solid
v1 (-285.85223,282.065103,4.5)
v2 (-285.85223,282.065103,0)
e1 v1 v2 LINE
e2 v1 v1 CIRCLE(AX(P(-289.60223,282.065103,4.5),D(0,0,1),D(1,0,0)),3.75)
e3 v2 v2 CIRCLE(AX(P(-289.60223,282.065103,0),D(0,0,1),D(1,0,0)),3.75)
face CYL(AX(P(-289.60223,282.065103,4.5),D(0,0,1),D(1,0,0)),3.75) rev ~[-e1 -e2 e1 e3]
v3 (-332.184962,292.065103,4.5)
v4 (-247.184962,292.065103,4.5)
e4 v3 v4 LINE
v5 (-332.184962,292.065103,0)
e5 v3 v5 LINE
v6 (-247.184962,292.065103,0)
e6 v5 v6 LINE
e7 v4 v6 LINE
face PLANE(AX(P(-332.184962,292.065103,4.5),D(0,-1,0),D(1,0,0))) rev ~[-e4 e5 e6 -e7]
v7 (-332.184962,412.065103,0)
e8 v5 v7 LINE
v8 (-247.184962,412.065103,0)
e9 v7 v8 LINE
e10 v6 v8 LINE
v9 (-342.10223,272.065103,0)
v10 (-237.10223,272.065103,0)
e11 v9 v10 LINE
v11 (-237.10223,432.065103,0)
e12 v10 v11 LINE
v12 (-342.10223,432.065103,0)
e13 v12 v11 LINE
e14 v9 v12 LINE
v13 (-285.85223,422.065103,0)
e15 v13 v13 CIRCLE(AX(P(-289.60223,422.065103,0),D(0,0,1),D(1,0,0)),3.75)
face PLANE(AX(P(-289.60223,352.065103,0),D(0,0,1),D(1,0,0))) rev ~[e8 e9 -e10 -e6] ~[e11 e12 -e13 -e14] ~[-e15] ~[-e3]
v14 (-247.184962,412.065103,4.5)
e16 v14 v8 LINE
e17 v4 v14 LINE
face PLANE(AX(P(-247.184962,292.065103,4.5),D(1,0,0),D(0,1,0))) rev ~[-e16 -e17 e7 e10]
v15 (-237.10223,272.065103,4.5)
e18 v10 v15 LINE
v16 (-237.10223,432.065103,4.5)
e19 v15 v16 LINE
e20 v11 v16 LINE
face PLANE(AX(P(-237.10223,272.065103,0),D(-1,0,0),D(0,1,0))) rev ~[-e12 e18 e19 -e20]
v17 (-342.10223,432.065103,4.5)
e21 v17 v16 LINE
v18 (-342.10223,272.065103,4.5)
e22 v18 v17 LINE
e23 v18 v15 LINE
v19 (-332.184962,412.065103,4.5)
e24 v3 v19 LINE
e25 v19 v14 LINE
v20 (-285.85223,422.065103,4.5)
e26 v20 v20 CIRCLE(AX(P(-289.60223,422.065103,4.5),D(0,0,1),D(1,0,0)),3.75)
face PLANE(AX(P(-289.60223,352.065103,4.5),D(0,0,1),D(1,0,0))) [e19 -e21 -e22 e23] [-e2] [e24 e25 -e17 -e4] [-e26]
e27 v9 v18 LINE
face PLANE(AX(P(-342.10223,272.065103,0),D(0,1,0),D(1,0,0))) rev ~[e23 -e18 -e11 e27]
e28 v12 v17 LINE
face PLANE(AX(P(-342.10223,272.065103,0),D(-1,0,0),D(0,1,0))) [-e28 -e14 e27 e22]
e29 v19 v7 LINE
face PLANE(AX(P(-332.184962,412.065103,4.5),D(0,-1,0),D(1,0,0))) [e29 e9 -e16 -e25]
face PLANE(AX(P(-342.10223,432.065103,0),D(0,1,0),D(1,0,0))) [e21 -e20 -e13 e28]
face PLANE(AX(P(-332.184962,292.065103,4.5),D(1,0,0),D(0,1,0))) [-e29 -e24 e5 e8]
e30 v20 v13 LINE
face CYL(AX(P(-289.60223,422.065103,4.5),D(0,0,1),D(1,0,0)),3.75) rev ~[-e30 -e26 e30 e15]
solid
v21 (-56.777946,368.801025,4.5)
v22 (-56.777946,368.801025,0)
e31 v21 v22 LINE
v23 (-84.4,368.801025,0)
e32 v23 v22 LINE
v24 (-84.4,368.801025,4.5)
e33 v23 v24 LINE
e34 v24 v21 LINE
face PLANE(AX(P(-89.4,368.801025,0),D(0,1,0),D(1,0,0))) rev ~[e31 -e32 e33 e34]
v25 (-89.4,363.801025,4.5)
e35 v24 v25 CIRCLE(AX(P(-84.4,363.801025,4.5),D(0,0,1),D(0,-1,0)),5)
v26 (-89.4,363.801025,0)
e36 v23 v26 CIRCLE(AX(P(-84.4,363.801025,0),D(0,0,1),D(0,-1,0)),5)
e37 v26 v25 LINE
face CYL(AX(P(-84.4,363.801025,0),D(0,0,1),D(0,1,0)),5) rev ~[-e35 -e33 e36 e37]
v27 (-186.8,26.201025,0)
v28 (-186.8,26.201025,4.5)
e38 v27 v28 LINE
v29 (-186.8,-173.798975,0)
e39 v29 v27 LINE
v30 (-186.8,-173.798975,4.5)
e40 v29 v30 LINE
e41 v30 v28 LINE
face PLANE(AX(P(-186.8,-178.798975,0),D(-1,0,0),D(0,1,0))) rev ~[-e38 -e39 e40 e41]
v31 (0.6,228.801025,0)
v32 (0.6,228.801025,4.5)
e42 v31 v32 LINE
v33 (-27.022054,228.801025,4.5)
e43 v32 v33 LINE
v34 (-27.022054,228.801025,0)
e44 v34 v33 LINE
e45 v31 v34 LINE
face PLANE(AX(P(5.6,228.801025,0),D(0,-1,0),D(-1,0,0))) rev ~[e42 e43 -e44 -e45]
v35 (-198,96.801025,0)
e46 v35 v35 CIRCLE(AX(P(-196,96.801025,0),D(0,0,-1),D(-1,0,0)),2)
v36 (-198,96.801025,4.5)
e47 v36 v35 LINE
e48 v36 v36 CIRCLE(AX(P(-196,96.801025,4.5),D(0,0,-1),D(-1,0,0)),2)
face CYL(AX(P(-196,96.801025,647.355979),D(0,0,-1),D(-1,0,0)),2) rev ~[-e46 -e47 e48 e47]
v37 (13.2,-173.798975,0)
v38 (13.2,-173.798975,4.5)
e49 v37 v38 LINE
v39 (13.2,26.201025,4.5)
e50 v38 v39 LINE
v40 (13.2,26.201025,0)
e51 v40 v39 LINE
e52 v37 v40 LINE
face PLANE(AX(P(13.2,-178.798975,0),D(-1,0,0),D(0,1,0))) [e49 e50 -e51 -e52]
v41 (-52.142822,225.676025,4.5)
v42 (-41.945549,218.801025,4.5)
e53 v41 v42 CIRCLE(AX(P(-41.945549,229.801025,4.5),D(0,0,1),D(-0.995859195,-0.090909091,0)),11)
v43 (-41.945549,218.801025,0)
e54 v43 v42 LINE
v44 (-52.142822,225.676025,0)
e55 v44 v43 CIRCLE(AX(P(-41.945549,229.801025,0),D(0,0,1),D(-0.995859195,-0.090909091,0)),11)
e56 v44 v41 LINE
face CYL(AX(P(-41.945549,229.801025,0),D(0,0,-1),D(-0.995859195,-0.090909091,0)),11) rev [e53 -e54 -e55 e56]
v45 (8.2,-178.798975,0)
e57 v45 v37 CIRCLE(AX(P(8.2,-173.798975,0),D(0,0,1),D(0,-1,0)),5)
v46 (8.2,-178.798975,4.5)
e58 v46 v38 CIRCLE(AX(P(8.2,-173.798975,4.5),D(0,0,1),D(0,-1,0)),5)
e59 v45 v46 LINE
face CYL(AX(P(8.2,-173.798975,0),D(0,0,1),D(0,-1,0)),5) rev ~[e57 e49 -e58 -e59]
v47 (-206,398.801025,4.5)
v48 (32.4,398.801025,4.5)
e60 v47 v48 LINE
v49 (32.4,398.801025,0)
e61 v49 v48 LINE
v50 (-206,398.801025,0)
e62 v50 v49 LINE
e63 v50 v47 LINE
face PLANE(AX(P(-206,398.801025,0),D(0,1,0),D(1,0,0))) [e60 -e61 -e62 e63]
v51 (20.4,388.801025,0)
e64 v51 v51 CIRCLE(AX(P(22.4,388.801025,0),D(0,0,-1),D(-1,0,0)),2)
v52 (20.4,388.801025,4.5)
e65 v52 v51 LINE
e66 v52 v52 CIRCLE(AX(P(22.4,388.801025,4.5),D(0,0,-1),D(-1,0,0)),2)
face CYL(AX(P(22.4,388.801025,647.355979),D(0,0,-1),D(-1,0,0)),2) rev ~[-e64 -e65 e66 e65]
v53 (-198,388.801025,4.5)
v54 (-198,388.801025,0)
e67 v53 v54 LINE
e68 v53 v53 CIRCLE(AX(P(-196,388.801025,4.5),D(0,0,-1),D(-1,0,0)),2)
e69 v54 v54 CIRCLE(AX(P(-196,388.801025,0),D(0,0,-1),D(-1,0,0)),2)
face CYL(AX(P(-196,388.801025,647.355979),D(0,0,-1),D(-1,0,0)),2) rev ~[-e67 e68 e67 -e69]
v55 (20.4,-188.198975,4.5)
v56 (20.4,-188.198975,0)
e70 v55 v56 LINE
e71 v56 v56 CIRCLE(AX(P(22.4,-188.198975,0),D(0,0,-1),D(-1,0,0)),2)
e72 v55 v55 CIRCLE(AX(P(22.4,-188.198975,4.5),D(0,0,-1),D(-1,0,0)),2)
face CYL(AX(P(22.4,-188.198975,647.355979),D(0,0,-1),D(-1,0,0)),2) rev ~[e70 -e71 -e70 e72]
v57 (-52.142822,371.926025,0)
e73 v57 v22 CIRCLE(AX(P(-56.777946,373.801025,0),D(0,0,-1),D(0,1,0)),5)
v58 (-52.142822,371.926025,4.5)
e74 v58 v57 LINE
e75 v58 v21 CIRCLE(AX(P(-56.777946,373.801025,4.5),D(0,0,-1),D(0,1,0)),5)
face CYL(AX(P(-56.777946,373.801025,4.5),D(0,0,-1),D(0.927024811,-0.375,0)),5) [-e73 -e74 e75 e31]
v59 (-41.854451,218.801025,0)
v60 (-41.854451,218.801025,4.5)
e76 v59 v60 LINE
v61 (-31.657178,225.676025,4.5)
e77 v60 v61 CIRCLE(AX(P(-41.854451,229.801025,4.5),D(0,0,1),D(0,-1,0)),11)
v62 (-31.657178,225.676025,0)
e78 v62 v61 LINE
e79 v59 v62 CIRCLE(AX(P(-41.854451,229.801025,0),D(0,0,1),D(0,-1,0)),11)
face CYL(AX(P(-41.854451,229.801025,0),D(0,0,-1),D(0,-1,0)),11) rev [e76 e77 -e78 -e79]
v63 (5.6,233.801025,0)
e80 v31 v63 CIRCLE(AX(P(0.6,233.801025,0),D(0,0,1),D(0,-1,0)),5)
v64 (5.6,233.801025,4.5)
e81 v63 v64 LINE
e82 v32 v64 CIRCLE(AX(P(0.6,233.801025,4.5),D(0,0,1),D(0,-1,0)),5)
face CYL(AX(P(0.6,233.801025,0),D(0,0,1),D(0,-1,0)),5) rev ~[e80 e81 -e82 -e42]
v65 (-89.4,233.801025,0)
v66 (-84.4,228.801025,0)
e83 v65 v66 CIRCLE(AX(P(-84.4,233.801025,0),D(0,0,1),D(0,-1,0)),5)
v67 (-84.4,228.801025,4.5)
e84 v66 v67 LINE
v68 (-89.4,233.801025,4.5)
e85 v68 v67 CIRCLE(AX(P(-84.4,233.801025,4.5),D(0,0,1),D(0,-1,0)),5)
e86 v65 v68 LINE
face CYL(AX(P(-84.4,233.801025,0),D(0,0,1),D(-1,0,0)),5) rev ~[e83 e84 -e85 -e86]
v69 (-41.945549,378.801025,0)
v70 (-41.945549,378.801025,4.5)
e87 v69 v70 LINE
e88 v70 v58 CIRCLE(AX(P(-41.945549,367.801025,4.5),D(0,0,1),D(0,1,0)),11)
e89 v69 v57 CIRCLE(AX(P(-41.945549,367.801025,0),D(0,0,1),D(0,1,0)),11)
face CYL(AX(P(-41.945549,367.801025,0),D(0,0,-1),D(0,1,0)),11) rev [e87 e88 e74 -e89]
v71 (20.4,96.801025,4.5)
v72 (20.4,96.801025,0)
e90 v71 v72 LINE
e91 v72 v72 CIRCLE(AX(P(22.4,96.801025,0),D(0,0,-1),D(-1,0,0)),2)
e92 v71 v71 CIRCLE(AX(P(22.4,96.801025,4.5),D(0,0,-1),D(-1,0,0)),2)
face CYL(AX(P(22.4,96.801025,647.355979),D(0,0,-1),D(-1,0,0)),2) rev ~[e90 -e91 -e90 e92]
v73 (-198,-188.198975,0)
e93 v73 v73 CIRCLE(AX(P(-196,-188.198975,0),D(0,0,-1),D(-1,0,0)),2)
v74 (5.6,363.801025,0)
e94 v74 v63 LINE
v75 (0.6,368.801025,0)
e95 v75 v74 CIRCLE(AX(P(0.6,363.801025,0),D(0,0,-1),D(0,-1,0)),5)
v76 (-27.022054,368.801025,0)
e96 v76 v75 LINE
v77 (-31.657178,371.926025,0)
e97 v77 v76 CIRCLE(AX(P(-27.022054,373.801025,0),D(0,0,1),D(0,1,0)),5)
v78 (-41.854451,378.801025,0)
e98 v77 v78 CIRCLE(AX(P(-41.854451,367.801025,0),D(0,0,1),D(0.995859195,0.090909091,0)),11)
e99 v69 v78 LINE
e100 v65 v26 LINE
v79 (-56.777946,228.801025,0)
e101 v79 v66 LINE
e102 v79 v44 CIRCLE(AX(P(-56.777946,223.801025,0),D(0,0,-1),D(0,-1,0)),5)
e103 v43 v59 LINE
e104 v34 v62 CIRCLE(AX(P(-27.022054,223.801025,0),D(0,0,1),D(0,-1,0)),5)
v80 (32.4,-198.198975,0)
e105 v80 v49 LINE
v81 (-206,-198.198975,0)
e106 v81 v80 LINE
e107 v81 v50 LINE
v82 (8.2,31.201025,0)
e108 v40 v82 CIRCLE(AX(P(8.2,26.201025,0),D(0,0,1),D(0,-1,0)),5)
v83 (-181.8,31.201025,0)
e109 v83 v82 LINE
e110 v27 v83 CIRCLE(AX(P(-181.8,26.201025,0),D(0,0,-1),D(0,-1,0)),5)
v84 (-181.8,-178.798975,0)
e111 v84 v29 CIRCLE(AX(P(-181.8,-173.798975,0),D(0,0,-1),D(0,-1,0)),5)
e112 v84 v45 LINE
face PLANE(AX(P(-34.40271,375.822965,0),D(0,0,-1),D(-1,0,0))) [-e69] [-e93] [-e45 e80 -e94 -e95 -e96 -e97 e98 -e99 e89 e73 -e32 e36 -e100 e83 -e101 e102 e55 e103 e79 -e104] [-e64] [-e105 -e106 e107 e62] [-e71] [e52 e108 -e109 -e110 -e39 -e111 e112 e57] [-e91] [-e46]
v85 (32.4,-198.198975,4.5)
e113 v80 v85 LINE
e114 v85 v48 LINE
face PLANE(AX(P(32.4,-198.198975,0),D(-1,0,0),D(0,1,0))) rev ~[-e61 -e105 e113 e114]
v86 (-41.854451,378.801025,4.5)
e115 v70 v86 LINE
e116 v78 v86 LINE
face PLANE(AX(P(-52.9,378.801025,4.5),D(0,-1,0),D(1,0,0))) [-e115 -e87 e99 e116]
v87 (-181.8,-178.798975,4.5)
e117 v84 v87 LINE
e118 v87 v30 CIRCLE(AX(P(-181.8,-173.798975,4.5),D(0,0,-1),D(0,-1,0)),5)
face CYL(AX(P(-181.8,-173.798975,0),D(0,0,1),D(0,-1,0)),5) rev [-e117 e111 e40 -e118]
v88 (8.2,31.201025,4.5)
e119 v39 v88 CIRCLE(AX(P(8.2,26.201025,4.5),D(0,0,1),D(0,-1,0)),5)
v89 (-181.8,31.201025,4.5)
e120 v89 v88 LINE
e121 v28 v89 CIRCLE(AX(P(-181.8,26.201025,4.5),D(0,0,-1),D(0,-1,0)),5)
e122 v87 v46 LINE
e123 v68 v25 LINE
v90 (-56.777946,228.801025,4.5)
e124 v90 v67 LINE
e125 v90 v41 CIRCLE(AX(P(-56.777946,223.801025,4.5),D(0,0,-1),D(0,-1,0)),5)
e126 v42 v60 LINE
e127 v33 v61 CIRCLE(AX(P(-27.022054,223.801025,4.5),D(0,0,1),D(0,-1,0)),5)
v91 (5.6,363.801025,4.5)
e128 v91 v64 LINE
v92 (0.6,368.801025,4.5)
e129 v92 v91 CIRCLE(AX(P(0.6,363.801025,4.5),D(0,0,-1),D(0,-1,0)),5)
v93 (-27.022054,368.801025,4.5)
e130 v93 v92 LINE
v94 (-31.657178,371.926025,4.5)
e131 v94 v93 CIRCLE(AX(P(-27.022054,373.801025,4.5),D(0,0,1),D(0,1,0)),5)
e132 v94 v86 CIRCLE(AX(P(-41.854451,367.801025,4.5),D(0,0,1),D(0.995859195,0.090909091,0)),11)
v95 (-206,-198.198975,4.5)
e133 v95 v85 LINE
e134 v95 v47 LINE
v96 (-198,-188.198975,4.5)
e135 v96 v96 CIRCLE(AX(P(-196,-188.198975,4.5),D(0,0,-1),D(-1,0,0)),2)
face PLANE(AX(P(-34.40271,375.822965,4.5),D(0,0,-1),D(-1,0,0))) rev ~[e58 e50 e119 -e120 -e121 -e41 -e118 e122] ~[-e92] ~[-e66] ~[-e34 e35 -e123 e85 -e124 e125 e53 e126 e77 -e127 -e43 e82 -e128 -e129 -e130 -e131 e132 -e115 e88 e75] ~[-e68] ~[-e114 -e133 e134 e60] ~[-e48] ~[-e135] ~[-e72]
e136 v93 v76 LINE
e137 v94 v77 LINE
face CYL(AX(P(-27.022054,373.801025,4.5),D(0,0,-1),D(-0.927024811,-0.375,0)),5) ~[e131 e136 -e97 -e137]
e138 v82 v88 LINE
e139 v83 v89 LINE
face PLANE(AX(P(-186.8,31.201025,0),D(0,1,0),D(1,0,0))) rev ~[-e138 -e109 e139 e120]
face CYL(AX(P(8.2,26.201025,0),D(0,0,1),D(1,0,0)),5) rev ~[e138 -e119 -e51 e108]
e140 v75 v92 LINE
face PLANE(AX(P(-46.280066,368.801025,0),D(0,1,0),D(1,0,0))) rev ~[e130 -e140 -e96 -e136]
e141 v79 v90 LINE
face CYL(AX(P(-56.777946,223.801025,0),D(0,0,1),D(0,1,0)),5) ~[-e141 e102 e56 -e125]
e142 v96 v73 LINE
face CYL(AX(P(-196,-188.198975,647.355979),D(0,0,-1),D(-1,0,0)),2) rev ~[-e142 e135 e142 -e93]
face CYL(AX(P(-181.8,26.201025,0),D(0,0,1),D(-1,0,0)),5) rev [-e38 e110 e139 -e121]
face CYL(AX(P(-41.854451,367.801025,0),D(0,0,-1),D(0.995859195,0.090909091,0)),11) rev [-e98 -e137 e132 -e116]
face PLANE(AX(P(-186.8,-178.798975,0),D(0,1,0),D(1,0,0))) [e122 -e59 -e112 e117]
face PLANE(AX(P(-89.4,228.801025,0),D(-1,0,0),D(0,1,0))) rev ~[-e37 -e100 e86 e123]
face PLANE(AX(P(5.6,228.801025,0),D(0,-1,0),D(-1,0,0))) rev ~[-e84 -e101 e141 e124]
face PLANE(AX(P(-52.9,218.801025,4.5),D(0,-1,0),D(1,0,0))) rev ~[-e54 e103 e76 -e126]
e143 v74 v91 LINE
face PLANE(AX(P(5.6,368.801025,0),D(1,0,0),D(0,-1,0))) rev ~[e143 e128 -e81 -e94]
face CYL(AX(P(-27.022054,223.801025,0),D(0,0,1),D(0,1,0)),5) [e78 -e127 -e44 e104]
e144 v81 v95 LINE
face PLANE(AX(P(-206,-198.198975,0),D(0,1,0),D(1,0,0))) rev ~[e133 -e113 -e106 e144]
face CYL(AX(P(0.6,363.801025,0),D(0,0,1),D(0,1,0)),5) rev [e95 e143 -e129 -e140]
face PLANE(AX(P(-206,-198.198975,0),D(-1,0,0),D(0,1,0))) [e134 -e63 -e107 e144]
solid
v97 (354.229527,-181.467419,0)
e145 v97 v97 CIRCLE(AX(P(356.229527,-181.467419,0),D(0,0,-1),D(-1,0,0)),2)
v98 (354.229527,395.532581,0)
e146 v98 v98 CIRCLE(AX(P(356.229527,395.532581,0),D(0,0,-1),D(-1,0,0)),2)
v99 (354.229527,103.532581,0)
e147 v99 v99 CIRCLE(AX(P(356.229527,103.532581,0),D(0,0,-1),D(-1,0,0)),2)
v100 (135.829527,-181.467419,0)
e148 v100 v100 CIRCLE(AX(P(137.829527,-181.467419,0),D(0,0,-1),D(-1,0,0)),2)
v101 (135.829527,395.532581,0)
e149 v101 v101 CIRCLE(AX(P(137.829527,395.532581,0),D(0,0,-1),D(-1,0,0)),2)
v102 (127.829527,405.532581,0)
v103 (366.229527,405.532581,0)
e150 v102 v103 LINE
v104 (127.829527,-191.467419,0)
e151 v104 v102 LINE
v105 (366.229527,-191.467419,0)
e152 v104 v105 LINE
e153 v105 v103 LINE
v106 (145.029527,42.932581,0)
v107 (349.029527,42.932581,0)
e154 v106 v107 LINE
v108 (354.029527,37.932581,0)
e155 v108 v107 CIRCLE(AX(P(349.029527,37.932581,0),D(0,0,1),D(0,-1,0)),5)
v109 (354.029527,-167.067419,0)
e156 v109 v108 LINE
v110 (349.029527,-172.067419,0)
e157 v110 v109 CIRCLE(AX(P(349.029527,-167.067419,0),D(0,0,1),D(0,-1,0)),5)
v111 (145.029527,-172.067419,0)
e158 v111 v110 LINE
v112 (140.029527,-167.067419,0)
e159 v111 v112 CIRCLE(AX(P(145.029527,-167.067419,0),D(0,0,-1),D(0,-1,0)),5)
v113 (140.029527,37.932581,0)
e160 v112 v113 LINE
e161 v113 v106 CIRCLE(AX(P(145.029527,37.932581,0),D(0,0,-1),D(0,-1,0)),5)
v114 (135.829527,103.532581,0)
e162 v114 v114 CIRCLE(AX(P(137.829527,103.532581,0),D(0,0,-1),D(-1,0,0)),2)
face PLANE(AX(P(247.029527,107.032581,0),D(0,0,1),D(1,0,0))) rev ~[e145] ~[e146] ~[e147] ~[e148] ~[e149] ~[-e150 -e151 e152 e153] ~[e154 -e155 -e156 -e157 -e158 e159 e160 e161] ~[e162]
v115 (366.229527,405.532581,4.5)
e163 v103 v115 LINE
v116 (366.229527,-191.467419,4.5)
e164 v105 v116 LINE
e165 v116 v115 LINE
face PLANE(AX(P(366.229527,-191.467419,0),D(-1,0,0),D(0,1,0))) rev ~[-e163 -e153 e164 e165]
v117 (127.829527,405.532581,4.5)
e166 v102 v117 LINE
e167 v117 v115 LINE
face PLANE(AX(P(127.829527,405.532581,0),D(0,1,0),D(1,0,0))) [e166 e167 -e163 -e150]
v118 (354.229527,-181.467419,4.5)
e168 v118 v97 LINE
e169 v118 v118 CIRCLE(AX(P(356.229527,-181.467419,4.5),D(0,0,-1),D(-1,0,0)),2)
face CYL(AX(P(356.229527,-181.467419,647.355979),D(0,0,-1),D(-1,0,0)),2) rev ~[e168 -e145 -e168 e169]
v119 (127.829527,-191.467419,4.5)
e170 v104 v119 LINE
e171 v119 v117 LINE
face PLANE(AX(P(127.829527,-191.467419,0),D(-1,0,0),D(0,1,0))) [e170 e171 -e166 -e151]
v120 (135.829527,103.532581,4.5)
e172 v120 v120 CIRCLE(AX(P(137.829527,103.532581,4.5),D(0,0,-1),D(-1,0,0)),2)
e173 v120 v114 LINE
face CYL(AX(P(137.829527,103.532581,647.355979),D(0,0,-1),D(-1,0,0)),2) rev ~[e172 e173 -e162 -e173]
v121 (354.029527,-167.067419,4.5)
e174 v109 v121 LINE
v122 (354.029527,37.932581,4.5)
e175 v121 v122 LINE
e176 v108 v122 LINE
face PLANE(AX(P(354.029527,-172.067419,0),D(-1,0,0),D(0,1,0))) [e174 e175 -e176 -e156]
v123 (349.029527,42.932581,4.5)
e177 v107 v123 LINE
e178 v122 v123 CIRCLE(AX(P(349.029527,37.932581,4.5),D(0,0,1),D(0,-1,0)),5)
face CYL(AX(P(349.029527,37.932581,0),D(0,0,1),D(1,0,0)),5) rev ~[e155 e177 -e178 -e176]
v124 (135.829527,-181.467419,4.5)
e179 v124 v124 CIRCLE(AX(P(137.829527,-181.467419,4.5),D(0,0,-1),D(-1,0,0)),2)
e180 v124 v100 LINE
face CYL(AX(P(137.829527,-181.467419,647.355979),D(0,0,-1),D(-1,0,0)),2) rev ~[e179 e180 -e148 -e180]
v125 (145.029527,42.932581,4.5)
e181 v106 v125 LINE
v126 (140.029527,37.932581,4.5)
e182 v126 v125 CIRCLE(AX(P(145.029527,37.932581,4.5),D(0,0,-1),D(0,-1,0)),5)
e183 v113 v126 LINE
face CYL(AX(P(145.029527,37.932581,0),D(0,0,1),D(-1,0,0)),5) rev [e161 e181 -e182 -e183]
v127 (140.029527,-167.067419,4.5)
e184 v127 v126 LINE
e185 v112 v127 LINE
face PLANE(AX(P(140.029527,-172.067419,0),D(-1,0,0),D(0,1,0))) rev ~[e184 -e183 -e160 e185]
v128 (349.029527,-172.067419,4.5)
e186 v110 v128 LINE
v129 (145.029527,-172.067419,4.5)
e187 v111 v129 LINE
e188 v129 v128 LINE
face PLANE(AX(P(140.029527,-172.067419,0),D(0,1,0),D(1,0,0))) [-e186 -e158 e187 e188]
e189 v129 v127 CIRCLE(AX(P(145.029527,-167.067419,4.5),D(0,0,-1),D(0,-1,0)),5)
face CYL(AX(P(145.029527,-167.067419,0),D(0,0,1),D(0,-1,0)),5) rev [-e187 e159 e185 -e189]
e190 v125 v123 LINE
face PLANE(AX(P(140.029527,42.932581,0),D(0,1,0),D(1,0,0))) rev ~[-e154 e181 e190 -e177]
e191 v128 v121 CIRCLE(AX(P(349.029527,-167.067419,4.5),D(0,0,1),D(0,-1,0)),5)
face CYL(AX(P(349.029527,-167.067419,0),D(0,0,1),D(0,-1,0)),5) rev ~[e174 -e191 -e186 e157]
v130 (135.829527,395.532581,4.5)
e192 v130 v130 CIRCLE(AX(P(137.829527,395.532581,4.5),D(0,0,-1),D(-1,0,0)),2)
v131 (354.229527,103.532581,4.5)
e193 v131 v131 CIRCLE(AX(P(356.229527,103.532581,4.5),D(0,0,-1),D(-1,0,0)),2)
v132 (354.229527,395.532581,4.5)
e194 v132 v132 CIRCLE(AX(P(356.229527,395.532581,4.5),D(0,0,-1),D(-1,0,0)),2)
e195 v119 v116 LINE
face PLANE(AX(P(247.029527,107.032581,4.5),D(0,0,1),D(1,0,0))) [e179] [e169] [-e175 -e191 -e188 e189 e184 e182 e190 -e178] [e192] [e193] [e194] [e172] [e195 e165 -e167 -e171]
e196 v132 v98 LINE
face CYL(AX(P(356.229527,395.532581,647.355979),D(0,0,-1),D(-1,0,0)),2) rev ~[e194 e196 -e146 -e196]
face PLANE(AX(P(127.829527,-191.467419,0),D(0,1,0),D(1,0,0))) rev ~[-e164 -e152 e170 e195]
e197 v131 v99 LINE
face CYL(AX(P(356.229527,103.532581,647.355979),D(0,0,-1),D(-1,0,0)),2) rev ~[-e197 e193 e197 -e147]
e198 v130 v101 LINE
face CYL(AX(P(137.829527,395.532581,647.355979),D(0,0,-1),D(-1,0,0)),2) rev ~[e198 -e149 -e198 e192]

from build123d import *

# Parameters (mm, degrees)
F0_W         = 238.4
F0_H         = 597
F0_W_2       = 200
F0_H_2       = 210
F1_DEPTH     = 4.5
F3_D         = 4
F4_W         = 238.4
F4_H         = 597
F4_W_2       = 214
F4_H_2       = 215
F5_DEPTH     = 4.5
F7_D         = 4
F8_R         = 5
F9_R         = 5
F10_R        = 5
F11_W        = 105
F11_H        = 160
F12_DEPTH    = 4.5
F13_W        = 85
F13_H        = 120
F13_R        = 3.75
F14_DEPTH    = 25
F15_W        = 22
F15_H        = 160
F16_DEPTH    = 25
F17_T1_DEPTH = 4.5
F18_R        = 5


# Not quite as in the source:
# - a fillet or chamfer that OpenCascade refuses, or shapes differently, is made with other operations: its cross-section is extruded or revolved along the edge and cut away or added


with BuildPart() as f1:
    # F0 (on Top) → F1 (new body)
    with BuildSketch(Plane.XY):
        with Locations((-86.8, 100.3010249138)):
            Rectangle(F0_W, F0_H)
        with Locations((-86.8, -73.7989750862)):
            Rectangle(F0_W_2, F0_H_2, mode=Mode.SUBTRACT)
        with BuildLine():
            ThreePointArc((-52.6800657034, 368.8010249138), (-49.4800657034, 372.0010249138), (-46.2800657034, 368.8010249138))
            Line((-46.2800657034, 368.8010249138), (5.6, 368.8010249138))
            Line((5.6, 368.8010249138), (5.6, 228.8010249138))
            Line((5.6, 228.8010249138), (-89.4, 228.8010249138))
            Line((-89.4, 228.8010249138), (-89.4, 368.8010249138))
            Line((-89.4, 368.8010249138), (-52.6800657034, 368.8010249138))
        make_face(mode=Mode.SUBTRACT)
    extrude(amount=F1_DEPTH)

    # F3 (through all)
    with Locations(Plane.XY.offset(4.5)):
        with Locations((-196, 388.8010249138), (22.4, 388.8010249138), (22.4, 96.8010249138), (-196, 96.8010249138), (-196, -188.1989750862), (22.4, -188.1989750862)):
            Hole(F3_D / 2)

    # F9
    f9_edges = [f1.edges().sort_by_distance(p)[0] for p in [
        (13.2, 31.201025, 2.25),
        (-186.8, 31.201025, 2.25),
        (13.2, -178.798975, 2.25),
        (-186.8, -178.798975, 2.25),
    ]]
    fillet(f9_edges, radius=F9_R)

    # F10
    f10_edges = [f1.edges().sort_by_distance(p)[0] for p in [
        (-89.4, 368.801025, 2.25),
        (5.6, 368.801025, 2.25),
        (5.6, 228.801025, 2.25),
        (-89.4, 228.801025, 2.25),
    ]]
    fillet(f10_edges, radius=F10_R)

    # F15 (on face) → F16 (cut)
    with BuildSketch(Plane.XY.offset(4.5)):
        with Locations((-41.9, 298.8010249138)):
            Rectangle(F15_W, F15_H)
    extrude(amount=-F16_DEPTH, mode=Mode.SUBTRACT)

    # F17: fillet of radius 11 on 4 edges, made by hand

    # F17_s2 → F17_t1 (join)
    with BuildSketch(Plane.XY):
        with BuildLine():
            ThreePointArc((-30.9, 368.8010249138), (-34.438252663, 375.9250633184), (-41.8544511501, 378.8010249138))
            Line((-41.8544511501, 378.8010249138), (-30.9, 378.8010249138))
            Line((-30.9, 378.8010249138), (-30.9, 368.8010249138))
        make_face()
        with BuildLine():
            ThreePointArc((-41.9455488499, 378.8010249138), (-49.361747337, 375.9250633184), (-52.9, 368.8010249138))
            Line((-52.9, 368.8010249138), (-52.9, 378.8010249138))
            Line((-52.9, 378.8010249138), (-41.9455488499, 378.8010249138))
        make_face()
        with BuildLine():
            ThreePointArc((-52.9, 228.8010249138), (-49.361747337, 221.6769865092), (-41.9455488499, 218.8010249138))
            Line((-41.9455488499, 218.8010249138), (-52.9, 218.8010249138))
            Line((-52.9, 218.8010249138), (-52.9, 228.8010249138))
        make_face()
        with BuildLine():
            ThreePointArc((-41.8544511501, 218.8010249138), (-34.438252663, 221.6769865092), (-30.9, 228.8010249138))
            Line((-30.9, 228.8010249138), (-30.9, 218.8010249138))
            Line((-30.9, 218.8010249138), (-41.8544511501, 218.8010249138))
        make_face()
    extrude(amount=F17_T1_DEPTH)

    # F18
    f18_edges = [f1.edges().sort_by_distance(p)[0] for p in [
        (-52.9, 368.801025, 2.25),
        (-30.9, 368.801025, 2.25),
        (-30.9, 228.801025, 2.25),
        (-52.9, 228.801025, 2.25),
    ]]
    fillet(f18_edges, radius=F18_R)


with BuildPart() as f5:
    # F4 (on Top) → F5 (new body)
    with BuildSketch(Plane.XY):
        with Locations((247.0295269012, 107.0325807333)):
            Rectangle(F4_W, F4_H)
        with Locations((247.0295269012, -64.5674192667)):
            Rectangle(F4_W_2, F4_H_2, mode=Mode.SUBTRACT)
    extrude(amount=F5_DEPTH)

    # F7 (through all)
    with Locations(Plane.XY.offset(4.5)):
        with Locations((137.8295269012, 395.5325807333), (356.2295269012, 395.5325807333), (356.2295269012, 103.5325807333), (137.8295269012, 103.5325807333), (137.8295269012, -181.4674192667), (356.2295269012, -181.4674192667)):
            Hole(F7_D / 2)

    # F8
    f8_edges = [f5.edges().sort_by_distance(p)[0] for p in [
        (354.029527, 42.932581, 2.25),
        (140.029527, 42.932581, 2.25),
        (354.029527, -172.067419, 2.25),
        (140.029527, -172.067419, 2.25),
    ]]
    fillet(f8_edges, radius=F8_R)


with BuildPart() as f12:
    # F11 (on Top) → F12 (new body)
    with BuildSketch(Plane.XY):
        with Locations((-289.6022295952, 352.065103054)):
            Rectangle(F11_W, F11_H)
    extrude(amount=F12_DEPTH)

    # F13 (on face) → F14 (cut)
    with BuildSketch(Plane.XY.offset(4.5)):
        with Locations((-289.6849620342, 352.065103054)):
            Rectangle(F13_W, F13_H)
        with Locations((-289.6022295952, 422.065103054)):
            Circle(F13_R)
        with Locations((-289.6022295952, 282.065103054)):
            Circle(F13_R)
    extrude(amount=-F14_DEPTH, mode=Mode.SUBTRACT)


solid = Compound([f1.part, f5.part, f12.part])
